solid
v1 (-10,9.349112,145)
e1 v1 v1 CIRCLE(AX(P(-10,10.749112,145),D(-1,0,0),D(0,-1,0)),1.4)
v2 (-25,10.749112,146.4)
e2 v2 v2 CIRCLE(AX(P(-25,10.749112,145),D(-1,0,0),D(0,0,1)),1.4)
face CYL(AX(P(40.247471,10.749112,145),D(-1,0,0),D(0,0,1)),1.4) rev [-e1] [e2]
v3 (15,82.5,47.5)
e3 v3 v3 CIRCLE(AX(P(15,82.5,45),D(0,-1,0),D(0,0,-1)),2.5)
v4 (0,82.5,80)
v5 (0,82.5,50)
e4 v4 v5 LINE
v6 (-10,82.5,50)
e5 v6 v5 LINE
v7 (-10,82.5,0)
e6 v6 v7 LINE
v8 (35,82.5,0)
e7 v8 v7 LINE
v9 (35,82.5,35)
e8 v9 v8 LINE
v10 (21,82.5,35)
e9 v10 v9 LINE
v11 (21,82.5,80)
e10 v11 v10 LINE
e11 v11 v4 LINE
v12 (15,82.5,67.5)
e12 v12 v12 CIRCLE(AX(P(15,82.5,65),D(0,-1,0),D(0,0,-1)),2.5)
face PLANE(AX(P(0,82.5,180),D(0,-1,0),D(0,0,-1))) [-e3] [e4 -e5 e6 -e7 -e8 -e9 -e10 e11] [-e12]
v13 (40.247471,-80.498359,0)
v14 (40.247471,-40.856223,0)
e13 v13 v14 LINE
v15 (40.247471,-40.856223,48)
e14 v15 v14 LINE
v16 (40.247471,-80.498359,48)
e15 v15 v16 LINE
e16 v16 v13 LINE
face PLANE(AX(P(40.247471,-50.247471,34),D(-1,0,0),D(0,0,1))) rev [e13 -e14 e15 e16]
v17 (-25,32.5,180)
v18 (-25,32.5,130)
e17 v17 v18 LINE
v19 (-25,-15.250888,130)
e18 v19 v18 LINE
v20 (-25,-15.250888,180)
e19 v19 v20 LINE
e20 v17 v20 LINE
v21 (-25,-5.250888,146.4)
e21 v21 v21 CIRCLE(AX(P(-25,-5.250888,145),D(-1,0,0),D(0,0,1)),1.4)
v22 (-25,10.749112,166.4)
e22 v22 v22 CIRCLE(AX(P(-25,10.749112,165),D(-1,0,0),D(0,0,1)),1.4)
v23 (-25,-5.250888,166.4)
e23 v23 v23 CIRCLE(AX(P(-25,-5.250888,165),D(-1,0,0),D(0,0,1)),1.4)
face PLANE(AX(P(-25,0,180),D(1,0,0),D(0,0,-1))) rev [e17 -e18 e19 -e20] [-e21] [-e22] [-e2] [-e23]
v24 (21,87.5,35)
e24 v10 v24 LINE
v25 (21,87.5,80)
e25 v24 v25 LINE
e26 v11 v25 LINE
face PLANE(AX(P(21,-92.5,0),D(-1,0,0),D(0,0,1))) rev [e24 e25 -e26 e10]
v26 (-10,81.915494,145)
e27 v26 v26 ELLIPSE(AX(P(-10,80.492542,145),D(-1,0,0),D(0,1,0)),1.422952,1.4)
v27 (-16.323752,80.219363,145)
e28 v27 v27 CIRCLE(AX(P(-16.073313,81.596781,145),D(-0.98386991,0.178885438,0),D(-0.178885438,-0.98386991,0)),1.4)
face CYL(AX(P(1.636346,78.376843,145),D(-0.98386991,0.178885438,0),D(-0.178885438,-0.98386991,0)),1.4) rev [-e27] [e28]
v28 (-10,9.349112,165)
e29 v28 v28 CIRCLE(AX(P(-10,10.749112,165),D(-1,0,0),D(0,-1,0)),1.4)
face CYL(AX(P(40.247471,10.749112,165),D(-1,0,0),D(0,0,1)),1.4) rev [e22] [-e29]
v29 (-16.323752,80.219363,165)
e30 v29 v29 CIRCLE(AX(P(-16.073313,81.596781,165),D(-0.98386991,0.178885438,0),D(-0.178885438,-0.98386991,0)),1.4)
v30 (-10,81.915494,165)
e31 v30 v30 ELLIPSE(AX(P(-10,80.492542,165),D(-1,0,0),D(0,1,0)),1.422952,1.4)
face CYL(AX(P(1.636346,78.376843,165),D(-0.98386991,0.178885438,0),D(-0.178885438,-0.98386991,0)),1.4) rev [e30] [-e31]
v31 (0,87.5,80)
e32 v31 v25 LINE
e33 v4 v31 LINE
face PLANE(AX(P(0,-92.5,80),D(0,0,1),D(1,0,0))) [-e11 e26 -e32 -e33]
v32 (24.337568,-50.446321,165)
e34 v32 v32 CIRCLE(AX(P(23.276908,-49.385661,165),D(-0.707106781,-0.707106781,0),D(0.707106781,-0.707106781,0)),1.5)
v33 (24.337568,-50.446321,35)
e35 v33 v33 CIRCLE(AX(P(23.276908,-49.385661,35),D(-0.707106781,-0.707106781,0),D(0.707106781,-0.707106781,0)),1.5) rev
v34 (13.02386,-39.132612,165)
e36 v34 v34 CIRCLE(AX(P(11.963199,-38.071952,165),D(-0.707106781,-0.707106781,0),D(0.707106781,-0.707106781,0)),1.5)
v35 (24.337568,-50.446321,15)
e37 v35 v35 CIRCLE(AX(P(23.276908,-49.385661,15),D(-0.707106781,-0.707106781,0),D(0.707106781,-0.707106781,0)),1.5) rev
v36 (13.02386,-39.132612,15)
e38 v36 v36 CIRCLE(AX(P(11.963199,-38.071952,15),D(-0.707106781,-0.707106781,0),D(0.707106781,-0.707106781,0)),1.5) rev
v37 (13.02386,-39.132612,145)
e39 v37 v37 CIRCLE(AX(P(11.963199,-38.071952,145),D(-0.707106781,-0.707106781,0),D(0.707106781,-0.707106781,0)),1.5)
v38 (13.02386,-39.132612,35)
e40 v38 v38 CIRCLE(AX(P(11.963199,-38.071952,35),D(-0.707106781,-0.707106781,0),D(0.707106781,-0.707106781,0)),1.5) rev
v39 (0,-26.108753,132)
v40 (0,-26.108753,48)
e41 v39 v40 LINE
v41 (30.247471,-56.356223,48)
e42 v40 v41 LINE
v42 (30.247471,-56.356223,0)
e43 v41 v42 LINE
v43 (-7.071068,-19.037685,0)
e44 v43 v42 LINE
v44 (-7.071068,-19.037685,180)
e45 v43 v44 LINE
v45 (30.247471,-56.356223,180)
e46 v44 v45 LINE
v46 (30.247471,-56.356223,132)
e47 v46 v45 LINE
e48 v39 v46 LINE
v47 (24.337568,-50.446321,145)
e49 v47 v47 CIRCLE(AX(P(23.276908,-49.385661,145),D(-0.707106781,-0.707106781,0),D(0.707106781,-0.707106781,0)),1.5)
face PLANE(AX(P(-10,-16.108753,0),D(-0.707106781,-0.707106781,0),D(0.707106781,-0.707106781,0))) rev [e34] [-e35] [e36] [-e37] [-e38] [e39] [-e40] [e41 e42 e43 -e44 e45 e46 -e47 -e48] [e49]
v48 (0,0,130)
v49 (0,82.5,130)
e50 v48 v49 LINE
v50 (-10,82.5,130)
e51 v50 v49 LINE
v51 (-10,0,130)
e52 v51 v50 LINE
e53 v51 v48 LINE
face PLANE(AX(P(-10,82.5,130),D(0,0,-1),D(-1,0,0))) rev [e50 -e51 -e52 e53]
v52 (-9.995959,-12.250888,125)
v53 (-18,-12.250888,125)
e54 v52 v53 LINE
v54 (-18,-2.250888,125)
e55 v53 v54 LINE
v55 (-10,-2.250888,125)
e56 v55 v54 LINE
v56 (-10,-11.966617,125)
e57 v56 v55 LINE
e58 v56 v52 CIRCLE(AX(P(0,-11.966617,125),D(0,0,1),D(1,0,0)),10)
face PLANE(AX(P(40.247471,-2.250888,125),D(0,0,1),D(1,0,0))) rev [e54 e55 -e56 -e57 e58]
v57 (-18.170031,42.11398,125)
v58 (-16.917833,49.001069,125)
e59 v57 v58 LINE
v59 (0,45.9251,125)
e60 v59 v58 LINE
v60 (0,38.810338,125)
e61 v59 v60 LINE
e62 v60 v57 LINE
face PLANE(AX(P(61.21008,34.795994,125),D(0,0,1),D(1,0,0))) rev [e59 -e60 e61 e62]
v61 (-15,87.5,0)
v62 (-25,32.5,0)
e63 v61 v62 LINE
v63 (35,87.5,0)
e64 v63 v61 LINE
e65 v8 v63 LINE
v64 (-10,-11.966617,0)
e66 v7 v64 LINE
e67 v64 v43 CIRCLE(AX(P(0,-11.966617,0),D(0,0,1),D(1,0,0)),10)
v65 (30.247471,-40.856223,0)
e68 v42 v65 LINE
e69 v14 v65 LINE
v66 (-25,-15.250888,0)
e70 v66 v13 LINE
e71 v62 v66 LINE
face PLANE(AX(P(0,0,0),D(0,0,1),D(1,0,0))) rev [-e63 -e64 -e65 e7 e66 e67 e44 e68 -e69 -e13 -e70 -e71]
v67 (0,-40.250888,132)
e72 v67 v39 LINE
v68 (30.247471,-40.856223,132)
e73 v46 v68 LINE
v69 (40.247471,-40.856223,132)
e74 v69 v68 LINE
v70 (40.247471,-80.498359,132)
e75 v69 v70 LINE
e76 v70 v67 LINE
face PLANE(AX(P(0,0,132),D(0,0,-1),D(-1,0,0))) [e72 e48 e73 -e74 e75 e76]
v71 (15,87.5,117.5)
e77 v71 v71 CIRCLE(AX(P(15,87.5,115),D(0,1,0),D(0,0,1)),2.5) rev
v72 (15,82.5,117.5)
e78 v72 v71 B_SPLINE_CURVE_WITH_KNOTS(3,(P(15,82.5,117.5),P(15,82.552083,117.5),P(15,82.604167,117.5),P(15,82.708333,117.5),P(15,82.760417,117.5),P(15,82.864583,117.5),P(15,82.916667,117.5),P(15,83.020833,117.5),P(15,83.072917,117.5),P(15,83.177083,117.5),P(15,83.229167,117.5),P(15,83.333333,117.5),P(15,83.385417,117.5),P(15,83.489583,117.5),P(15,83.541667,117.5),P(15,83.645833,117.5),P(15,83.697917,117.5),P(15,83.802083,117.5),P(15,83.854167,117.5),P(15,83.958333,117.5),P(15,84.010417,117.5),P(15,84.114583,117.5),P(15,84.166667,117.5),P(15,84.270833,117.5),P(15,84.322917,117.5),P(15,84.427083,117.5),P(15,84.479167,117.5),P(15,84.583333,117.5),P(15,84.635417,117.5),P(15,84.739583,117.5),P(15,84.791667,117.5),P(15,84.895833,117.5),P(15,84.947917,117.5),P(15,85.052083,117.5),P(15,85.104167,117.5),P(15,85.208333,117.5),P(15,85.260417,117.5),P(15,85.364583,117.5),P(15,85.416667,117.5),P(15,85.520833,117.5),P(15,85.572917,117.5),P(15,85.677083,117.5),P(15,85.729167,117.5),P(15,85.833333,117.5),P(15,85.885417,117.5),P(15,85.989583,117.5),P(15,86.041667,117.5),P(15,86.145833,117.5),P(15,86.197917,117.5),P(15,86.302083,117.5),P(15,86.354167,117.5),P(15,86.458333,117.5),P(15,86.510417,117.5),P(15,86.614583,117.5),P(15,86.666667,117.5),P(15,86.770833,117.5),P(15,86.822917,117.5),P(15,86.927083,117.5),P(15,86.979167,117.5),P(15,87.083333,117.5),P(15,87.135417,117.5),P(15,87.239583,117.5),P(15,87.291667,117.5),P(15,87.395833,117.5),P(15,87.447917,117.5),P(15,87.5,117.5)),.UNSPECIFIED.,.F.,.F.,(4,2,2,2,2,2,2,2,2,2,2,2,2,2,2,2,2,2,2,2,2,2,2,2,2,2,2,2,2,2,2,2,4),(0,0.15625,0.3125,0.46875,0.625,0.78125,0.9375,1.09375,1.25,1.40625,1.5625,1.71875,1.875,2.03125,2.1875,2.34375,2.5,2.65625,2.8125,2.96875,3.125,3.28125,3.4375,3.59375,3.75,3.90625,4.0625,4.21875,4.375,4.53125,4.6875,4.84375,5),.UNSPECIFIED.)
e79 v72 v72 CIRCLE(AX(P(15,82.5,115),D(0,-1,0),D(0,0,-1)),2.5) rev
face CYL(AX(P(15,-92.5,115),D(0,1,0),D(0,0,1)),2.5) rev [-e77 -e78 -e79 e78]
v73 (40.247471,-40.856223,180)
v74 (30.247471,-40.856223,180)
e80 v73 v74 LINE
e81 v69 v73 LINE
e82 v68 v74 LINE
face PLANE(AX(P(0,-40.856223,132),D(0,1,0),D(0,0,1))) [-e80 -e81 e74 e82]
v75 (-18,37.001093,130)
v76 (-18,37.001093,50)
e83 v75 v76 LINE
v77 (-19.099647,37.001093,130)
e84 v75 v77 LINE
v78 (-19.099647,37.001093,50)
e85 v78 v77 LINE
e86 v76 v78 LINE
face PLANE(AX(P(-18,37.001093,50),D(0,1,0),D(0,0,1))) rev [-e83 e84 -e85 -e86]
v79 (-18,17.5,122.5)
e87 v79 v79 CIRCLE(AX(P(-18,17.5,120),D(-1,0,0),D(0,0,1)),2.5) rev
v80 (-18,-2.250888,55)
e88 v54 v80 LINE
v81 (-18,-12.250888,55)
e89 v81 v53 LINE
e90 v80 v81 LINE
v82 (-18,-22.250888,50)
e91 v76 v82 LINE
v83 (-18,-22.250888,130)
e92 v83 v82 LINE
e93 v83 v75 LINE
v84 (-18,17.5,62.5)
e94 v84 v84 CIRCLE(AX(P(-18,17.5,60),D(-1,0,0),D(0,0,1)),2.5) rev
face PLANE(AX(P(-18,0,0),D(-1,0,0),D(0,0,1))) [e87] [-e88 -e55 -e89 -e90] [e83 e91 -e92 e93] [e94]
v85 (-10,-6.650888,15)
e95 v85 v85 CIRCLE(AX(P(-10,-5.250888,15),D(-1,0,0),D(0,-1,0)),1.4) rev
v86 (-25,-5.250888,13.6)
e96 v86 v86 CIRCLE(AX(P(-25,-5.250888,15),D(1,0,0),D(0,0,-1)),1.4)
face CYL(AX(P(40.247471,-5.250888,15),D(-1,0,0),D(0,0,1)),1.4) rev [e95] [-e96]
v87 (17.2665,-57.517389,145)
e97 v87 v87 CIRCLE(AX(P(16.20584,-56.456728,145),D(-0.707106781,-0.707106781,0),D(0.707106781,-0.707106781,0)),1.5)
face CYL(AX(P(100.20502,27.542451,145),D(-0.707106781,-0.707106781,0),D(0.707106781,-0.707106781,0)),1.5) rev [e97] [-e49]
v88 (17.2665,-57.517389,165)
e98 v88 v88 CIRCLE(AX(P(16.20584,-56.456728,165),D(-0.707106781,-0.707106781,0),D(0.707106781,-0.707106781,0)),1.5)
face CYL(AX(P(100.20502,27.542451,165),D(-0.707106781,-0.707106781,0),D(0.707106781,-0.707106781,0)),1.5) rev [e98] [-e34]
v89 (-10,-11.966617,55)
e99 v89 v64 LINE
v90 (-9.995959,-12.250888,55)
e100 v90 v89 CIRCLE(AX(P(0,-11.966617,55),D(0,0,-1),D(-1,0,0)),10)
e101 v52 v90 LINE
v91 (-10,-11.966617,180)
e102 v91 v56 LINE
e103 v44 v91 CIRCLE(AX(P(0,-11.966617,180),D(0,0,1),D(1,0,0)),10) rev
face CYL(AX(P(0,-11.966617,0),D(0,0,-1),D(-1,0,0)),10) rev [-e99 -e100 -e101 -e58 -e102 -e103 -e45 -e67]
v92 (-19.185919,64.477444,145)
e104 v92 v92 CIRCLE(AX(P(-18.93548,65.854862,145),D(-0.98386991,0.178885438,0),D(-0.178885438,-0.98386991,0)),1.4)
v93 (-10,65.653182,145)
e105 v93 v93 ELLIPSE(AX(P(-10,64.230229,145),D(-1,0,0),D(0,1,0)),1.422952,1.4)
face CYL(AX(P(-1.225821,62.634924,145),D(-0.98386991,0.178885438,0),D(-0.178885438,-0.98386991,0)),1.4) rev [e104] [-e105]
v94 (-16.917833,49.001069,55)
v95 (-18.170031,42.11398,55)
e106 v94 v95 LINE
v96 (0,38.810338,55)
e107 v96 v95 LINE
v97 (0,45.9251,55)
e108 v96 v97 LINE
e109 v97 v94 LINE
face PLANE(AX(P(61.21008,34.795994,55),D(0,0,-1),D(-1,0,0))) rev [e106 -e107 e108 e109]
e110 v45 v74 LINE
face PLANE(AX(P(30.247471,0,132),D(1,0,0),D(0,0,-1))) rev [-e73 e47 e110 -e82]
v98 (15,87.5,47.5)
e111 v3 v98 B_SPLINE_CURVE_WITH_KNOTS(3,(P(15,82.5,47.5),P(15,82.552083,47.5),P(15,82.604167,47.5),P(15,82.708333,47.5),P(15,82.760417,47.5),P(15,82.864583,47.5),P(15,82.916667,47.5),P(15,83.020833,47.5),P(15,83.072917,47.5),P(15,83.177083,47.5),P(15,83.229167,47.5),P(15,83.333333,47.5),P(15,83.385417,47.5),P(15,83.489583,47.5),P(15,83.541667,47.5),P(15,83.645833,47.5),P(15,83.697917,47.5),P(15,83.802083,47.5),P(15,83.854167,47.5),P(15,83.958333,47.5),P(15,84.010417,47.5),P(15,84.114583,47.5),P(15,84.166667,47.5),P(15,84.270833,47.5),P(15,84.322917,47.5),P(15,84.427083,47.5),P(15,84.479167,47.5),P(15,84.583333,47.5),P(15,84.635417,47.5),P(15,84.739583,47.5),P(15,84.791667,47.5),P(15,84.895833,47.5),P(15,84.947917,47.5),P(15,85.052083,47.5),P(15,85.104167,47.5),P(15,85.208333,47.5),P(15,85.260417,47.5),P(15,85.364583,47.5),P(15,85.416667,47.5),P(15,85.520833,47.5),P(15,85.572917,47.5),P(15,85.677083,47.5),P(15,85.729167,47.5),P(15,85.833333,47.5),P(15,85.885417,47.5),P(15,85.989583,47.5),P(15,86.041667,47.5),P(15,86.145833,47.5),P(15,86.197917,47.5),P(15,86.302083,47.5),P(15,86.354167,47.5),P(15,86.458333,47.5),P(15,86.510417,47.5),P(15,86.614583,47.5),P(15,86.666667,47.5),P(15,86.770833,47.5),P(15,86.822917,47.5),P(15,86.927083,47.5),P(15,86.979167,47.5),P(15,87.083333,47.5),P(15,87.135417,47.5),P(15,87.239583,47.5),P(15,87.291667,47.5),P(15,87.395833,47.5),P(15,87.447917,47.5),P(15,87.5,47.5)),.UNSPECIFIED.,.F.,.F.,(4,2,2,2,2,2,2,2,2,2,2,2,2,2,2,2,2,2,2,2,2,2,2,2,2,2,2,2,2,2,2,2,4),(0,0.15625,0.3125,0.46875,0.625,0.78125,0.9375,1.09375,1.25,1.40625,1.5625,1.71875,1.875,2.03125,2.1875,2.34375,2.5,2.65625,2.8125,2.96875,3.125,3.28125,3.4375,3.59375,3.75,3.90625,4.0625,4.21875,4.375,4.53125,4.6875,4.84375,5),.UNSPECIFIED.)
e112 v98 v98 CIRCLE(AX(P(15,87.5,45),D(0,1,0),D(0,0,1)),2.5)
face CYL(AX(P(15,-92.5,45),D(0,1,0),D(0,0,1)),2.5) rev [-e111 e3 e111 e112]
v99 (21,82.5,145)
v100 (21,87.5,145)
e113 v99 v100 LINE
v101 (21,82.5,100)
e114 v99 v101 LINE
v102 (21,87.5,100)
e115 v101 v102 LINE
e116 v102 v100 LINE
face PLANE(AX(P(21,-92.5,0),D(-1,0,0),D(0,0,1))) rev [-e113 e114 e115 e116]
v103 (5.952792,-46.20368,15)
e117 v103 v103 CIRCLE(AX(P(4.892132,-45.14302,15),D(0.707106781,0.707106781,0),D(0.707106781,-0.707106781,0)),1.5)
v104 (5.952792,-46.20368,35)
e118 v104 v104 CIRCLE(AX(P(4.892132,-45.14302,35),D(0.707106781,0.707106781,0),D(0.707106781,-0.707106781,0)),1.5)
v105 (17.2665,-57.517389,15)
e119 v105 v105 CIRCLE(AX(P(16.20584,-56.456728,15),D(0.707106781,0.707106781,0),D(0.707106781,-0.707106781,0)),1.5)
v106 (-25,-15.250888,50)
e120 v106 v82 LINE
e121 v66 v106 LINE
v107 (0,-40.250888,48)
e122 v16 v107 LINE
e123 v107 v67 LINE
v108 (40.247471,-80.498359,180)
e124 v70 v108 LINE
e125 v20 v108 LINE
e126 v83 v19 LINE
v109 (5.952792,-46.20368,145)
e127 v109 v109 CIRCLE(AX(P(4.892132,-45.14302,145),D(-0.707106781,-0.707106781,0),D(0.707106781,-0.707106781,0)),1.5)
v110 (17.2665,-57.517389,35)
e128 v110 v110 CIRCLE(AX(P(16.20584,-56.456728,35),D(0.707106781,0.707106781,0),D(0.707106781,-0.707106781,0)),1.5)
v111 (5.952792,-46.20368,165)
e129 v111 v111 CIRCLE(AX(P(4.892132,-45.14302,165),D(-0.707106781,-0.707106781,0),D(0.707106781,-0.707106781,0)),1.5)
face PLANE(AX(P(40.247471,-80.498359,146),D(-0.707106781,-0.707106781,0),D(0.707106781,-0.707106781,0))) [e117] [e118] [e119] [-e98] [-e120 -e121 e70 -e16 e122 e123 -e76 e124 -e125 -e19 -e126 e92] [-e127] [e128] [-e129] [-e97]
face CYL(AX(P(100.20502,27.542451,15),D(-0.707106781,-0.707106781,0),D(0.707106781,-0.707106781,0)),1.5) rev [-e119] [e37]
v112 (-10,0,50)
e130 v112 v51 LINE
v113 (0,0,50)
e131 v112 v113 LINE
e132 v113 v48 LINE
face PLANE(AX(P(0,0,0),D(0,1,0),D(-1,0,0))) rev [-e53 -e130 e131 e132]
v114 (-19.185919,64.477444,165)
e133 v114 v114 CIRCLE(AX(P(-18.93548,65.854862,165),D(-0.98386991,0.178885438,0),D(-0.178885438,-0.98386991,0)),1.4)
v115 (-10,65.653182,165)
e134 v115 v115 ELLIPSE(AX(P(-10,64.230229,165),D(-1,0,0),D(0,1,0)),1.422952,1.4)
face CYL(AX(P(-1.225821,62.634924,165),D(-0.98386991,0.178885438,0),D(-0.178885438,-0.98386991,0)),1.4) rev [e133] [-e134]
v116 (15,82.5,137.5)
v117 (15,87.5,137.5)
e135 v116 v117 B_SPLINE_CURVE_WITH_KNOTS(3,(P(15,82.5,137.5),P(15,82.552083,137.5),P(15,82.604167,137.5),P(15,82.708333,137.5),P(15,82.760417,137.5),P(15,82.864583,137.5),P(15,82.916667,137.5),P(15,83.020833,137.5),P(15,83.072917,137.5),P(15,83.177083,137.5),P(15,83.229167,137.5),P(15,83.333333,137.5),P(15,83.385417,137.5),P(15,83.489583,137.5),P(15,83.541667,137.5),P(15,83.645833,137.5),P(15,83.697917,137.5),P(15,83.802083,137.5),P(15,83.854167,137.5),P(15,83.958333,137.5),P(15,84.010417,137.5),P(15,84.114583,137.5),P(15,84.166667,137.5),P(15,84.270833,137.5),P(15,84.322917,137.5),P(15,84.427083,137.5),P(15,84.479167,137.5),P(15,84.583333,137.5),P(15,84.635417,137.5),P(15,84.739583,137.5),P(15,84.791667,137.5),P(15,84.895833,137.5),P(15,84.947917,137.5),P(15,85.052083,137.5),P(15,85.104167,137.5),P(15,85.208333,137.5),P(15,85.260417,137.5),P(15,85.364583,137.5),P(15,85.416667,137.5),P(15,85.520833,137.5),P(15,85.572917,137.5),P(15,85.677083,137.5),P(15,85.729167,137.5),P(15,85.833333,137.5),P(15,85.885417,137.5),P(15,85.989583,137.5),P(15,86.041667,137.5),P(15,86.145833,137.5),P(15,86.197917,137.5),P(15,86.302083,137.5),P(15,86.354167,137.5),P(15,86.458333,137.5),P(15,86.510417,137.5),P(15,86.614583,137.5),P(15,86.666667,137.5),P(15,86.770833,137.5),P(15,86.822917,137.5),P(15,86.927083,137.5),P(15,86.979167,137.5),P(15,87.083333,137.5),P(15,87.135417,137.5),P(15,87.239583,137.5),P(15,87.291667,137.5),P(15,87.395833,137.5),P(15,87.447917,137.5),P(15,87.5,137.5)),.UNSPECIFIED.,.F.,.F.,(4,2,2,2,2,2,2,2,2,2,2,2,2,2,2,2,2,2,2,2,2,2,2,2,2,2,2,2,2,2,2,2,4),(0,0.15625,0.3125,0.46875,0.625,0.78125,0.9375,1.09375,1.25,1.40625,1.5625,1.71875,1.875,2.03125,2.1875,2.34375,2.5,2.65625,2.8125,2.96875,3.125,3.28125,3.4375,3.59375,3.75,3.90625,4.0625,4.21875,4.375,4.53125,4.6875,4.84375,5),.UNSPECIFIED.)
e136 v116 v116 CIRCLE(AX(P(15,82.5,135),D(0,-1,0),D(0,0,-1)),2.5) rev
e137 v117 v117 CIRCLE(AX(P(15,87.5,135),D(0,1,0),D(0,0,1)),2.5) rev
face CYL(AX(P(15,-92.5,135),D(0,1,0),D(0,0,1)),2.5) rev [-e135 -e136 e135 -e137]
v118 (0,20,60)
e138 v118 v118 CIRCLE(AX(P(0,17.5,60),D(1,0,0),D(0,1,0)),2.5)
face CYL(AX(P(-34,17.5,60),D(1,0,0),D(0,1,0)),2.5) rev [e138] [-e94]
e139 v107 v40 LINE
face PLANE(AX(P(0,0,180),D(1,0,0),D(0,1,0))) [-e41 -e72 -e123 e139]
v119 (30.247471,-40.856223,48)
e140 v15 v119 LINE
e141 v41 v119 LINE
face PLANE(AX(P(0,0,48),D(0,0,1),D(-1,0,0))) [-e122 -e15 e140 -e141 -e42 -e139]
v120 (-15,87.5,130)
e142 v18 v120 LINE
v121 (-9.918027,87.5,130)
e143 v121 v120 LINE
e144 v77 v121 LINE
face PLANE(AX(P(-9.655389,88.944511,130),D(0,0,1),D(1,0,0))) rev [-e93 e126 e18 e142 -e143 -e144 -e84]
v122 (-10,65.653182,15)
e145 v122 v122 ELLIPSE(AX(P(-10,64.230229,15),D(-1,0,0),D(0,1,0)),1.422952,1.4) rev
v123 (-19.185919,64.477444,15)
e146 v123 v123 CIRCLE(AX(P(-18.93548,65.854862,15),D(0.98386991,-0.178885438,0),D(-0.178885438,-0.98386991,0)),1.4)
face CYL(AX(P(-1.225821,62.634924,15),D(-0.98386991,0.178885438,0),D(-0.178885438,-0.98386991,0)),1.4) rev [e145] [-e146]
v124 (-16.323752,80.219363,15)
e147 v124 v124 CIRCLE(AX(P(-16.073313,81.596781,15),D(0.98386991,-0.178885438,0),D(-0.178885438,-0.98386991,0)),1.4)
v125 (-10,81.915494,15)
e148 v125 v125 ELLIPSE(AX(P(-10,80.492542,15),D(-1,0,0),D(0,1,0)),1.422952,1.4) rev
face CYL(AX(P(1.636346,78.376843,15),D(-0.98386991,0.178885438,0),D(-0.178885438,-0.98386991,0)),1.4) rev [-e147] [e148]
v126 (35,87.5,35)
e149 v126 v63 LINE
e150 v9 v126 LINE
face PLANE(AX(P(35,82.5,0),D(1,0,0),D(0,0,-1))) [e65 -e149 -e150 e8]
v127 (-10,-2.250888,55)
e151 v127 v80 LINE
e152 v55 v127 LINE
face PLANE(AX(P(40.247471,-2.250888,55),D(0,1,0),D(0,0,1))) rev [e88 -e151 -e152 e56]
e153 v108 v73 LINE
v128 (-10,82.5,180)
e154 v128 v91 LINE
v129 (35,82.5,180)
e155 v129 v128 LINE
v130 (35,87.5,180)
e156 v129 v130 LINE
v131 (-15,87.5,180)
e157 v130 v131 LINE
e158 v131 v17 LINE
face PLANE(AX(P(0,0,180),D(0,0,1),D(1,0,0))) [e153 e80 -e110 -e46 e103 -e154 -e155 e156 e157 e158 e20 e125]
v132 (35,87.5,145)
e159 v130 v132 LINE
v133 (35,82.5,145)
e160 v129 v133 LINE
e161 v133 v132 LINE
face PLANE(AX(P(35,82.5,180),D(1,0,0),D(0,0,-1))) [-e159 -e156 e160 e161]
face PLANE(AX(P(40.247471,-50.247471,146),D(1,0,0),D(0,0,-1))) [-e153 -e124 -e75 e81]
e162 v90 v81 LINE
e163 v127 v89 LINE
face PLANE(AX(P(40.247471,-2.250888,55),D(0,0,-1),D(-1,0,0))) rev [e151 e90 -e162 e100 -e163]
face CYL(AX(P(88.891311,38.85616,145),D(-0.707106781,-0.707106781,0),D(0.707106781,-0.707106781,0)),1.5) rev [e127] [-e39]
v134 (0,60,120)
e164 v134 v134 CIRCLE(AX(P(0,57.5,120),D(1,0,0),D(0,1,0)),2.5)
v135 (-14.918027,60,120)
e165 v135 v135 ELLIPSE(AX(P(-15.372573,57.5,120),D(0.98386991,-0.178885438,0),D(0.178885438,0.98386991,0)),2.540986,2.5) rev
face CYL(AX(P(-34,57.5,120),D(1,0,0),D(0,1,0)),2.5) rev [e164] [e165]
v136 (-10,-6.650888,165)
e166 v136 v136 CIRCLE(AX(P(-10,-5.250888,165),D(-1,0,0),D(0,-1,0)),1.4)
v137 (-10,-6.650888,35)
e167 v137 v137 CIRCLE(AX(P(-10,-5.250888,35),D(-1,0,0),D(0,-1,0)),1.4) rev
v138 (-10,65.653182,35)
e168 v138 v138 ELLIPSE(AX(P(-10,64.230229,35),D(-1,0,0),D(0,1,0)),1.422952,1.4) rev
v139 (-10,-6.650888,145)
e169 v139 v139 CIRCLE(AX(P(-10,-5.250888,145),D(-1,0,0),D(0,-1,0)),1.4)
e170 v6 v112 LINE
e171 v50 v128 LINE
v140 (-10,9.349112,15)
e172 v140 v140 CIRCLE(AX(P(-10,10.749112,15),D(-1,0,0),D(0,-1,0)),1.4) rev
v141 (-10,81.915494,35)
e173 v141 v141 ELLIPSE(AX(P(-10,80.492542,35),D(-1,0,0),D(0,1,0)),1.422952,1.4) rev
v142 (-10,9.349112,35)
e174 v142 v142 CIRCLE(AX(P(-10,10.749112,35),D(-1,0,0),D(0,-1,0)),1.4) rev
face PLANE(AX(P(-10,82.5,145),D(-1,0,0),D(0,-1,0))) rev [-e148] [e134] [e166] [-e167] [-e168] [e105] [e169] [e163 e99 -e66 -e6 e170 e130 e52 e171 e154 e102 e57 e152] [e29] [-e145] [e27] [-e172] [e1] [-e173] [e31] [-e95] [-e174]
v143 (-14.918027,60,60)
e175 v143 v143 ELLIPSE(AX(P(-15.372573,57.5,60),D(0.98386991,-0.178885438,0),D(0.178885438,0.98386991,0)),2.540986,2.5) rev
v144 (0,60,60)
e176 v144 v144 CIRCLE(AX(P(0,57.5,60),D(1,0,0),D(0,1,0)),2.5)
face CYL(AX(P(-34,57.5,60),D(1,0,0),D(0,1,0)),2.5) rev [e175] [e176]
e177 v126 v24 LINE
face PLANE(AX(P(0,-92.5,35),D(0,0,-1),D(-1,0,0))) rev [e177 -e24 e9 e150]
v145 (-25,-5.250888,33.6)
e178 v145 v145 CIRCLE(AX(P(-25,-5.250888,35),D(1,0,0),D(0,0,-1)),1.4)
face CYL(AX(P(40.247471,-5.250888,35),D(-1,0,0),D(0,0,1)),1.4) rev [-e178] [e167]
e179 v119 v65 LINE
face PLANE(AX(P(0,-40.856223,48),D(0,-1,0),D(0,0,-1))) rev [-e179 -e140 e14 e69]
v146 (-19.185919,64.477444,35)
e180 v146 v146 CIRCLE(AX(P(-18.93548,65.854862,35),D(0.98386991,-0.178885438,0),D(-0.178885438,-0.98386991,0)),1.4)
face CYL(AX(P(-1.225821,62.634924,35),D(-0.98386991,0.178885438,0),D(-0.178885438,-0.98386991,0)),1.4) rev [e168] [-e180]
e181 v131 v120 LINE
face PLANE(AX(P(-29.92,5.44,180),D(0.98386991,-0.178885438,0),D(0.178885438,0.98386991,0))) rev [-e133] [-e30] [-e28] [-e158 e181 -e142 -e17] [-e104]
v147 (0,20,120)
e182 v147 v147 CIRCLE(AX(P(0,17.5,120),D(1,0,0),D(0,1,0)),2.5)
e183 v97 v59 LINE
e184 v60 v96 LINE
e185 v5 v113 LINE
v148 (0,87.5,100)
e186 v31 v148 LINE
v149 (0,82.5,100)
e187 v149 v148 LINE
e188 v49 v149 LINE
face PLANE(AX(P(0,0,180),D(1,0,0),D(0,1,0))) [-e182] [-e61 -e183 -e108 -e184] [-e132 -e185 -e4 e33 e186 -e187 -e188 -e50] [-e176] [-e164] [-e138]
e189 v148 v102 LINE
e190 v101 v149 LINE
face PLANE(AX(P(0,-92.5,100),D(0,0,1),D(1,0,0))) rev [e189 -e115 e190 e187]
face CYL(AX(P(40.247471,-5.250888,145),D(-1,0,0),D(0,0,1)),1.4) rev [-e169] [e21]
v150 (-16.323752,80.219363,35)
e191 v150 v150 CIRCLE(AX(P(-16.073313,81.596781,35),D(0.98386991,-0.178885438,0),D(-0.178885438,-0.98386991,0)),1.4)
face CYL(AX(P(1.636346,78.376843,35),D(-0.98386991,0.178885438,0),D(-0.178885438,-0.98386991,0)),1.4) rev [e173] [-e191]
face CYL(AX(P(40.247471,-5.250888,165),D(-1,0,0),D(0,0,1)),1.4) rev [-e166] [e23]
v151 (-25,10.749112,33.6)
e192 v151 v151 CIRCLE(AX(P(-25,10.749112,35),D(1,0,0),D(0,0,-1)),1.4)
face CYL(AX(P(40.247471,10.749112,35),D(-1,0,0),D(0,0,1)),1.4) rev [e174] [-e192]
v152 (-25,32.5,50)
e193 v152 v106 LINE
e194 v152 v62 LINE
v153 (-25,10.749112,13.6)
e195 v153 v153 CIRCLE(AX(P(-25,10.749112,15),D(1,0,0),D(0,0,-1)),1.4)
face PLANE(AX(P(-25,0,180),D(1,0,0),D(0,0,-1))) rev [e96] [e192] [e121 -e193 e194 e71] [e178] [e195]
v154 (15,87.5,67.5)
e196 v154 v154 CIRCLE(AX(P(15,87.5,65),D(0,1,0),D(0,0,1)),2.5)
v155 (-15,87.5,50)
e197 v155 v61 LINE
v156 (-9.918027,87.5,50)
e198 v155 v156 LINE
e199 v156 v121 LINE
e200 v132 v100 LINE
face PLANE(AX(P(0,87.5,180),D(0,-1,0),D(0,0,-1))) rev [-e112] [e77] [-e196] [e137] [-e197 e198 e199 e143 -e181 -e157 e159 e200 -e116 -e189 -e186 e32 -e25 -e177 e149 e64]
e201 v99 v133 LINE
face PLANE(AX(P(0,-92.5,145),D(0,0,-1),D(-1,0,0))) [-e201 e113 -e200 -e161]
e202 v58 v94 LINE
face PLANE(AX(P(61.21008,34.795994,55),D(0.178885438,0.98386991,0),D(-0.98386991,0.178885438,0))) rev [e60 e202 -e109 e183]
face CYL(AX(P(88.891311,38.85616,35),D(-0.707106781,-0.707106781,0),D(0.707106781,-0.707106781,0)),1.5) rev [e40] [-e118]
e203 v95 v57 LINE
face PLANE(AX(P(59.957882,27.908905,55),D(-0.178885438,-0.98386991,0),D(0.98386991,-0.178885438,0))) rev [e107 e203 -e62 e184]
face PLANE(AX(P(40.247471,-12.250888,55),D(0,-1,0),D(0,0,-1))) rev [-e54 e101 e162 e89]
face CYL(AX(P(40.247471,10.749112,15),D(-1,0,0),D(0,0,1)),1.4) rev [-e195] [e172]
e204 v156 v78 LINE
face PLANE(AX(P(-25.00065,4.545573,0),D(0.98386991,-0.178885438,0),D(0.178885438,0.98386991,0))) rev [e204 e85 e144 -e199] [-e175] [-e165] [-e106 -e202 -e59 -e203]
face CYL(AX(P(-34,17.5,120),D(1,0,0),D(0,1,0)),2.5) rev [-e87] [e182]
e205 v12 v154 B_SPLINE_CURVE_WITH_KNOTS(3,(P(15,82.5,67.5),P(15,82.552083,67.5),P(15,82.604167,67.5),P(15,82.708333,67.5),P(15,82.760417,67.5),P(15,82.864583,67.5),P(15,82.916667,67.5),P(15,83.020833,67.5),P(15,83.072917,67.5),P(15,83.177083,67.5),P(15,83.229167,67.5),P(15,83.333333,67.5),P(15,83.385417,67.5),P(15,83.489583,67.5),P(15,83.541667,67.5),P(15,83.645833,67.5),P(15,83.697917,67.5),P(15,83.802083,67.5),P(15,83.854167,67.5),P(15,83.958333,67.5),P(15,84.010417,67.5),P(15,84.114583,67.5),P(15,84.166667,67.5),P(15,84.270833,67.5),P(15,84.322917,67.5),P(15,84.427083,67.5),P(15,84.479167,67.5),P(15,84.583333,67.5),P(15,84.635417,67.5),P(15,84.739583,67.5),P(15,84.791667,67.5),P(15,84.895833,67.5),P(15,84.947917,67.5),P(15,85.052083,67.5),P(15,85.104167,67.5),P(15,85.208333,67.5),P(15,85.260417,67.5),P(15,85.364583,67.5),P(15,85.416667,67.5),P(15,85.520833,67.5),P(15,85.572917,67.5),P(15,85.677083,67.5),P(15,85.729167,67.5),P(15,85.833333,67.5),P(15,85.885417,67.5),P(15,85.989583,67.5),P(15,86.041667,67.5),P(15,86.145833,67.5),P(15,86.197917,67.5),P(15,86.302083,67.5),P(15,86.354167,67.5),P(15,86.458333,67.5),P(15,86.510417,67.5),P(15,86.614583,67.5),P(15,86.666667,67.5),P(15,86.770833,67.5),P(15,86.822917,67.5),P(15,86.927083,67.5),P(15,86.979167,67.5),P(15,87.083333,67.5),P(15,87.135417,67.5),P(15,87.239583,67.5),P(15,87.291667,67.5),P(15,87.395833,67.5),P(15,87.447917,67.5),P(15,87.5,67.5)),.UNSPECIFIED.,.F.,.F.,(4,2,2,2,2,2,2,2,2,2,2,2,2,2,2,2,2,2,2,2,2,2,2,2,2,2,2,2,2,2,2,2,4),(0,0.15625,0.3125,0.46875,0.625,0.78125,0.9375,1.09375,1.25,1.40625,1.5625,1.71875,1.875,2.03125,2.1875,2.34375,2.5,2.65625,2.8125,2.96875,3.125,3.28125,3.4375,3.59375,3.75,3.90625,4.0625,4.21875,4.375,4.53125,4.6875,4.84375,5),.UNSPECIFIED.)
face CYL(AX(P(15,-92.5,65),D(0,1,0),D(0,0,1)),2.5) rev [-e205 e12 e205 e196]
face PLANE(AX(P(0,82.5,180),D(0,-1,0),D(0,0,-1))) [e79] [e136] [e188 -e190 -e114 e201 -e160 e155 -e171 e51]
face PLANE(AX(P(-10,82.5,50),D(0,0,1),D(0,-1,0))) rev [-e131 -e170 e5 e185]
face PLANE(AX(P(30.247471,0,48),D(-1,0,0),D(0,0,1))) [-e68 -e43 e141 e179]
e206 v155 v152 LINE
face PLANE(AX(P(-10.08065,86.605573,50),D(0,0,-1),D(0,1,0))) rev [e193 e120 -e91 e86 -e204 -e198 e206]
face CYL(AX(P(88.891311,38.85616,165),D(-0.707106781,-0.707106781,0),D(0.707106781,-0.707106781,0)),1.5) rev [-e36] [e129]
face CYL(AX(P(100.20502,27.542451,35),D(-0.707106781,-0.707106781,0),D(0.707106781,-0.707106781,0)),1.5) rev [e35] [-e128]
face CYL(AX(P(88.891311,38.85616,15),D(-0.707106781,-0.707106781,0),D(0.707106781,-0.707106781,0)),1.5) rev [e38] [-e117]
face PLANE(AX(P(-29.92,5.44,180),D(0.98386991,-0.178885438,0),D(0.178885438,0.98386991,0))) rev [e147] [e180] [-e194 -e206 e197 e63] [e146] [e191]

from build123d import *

# Parameters (mm, degrees)
BOSS_EXTRUDE2_DEPTH = 180
SKETCH2_R           = 2.5
CUT_EXTRUDE1_DEPTH  = 180
SKETCH3_W           = 10
SKETCH3_H           = 82.5
CUT_EXTRUDE2_DEPTH  = 35
BOSS_EXTRUDE3_DEPTH = 34
CUT_EXTRUDE3_DEPTH  = 205.147272565
SKETCH6_R           = 2.5
CUT_EXTRUDE4_DEPTH  = 34
CUT_EXTRUDE5_DEPTH  = 5
SKETCH8_W           = 80
SKETCH8_H           = 62.155508182
CUT_EXTRUDE8_DEPTH  = 7
CUT_EXTRUDE9_DEPTH  = 205.147272565
SKETCH11_W          = 10
SKETCH11_H          = 35
BOSS_EXTRUDE4_DEPTH = 5
SKETCH12_W          = 15
SKETCH12_H          = 82.5
CUT_EXTRUDE11_DEPTH = 10
SKETCH10_R          = 1.4
CUT_EXTRUDE10_DEPTH = 18
SKETCH14_R          = 1.4
CUT_EXTRUDE12_DEPTH = 211.50767784
BOSS_EXTRUDE5_DEPTH = 14
SKETCH16_R          = 1.5
CUT_EXTRUDE13_DEPTH = 219.238688301
SKETCH17_W          = 70
SKETCH17_H          = 7
CUT_EXTRUDE14_DEPTH = 210.498896517
SKETCH18_W          = 70
SKETCH18_H          = 10
CUT_EXTRUDE15_DEPTH = 209.444279941
BOSS_EXTRUDE6_DEPTH = 48
FILLET1_R           = 10


# Read off the part's stored shape, not the designer's step: Boss-Extrude2
with BuildPart() as part:
    # Boss-Extrude2 outline → Boss-Extrude2 (new body)
    with BuildSketch(Plane.XY):
        Polygon((-25, 32.5), (-25, -32.5), (-15, -87.5), (25, -87.5), (25, -82.5), (0, -82.5), (0, 82.5), (25, 82.5), (25, 87.5), (-15, 87.5), align=None)
    extrude(amount=BOSS_EXTRUDE2_DEPTH)

    # Sketch2 → Cut-Extrude1 (cut)
    with BuildSketch(Plane(origin=(0, 87.5, 0), x_dir=(1, 0, 0), z_dir=(0, 1, 0))):
        Polygon((25, -35), (21, -35), (21, -80), (0, -80), (0, -100), (21, -100), (21, -145), (25, -145), align=None)
        with Locations(Location((15, -45, 0), (0, 0, 270))):
            Circle(SKETCH2_R)
        with Locations(Location((15, -65, 0), (0, 0, 270))):
            Circle(SKETCH2_R)
        with Locations(Location((15, -115, 0), (0, 0, 270))):
            Circle(SKETCH2_R)
        with Locations(Location((15, -135, 0), (0, 0, 270))):
            Circle(SKETCH2_R)
    extrude(amount=-CUT_EXTRUDE1_DEPTH, mode=Mode.SUBTRACT)

    # Sketch3 → Cut-Extrude2 (cut)
    with BuildSketch(Plane.XY.offset(180)):
        with Locations((-5, 41.25)):
            Rectangle(SKETCH3_W, SKETCH3_H)
    cut_extrude2 = extrude(amount=-CUT_EXTRUDE2_DEPTH, mode=Mode.SUBTRACT)

    # Mirror1: Cut-Extrude2 across plane
    add(cut_extrude2.mirror(Plane.XY.offset(90)), mode=Mode.SUBTRACT)

    # Sketch4 → Boss-Extrude3 (add)
    with BuildSketch(Plane.XY.offset(180)):
        Polygon((-10, 0), (40.247470675, -50.247470675), (40.247470675, -80.498358966), (-25, -15.250888291), align=None)
    boss_extrude3 = extrude(amount=-BOSS_EXTRUDE3_DEPTH)

    # Mirror2: Boss-Extrude3 across plane
    add(boss_extrude3.mirror(Plane.XY.offset(90)))

    # Sketch5 → Cut-Extrude3 (cut, through all)
    with BuildSketch(Plane.XY.offset(180)):
        Polygon((0, 0), (-10, 0), (0, -10), align=None)
        Polygon((0, -40.250888291), (-25, -15.250888291), (-25, -32.5), (-15, -87.5), (25, -87.5), (25, -82.5), (0, -82.5), align=None)
    extrude(amount=-CUT_EXTRUDE3_DEPTH, mode=Mode.SUBTRACT)

    # Sketch6 → Cut-Extrude4 (cut)
    with BuildSketch(Plane(origin=(0, 0, 0), x_dir=(0, 0, -1), z_dir=(1, 0, 0))):
        with Locations(Location((-120, 57.5, 0), (0, 0, 90))):
            Circle(SKETCH6_R)
        with Locations(Location((-60, 57.5, 0), (0, 0, 90))):
            Circle(SKETCH6_R)
        with Locations(Location((-120, 17.5, 0), (0, 0, 90))):
            Circle(SKETCH6_R)
        with Locations(Location((-60, 17.5, 0), (0, 0, 90))):
            Circle(SKETCH6_R)
    extrude(amount=-CUT_EXTRUDE4_DEPTH, mode=Mode.SUBTRACT)

    # Sketch7 → Cut-Extrude5 (cut)
    with BuildSketch(Plane(origin=(-29.92, 5.44, 0), x_dir=(0, 0, 1), z_dir=(-0.9838699100999075, 0.17888543819998307, 0))):
        Polygon((50, 83.405335561), (50, 27.503636123), (130, 27.503636123), (130, 85.782619375), (130, 90.970472455), (50, 90.970472455), align=None)
    extrude(amount=-CUT_EXTRUDE5_DEPTH, mode=Mode.SUBTRACT)

    # Sketch8 → Cut-Extrude8 (cut)
    with BuildSketch(Plane.ZY.offset(25)):
        with Locations((90, 5.923338625)):
            Rectangle(SKETCH8_W, SKETCH8_H)
    extrude(amount=-CUT_EXTRUDE8_DEPTH, mode=Mode.SUBTRACT)

    # Sketch9 → Cut-Extrude9 (cut, through all)
    with BuildSketch(Plane.XY.offset(180)):
        Polygon((-10, 0), (40.247470675, -50.247470675), (40.247470675, -66.356223342), (-10, -16.108752667), align=None)
    extrude(amount=-CUT_EXTRUDE9_DEPTH, mode=Mode.SUBTRACT)

    # Sketch11 → Boss-Extrude4 (add)
    with BuildSketch(Plane(origin=(0, 87.5, 0), x_dir=(1, 0, 0), z_dir=(0, 1, 0))):
        with Locations((30, -17.5)):
            Rectangle(SKETCH11_W, SKETCH11_H)
        with Locations((30, -162.5)):
            Rectangle(SKETCH11_W, SKETCH11_H)
    extrude(amount=-BOSS_EXTRUDE4_DEPTH)

    # Sketch12 → Cut-Extrude11 (cut)
    with BuildSketch(Plane(origin=(0, 0, 0), x_dir=(0, 0, -1), z_dir=(1, 0, 0))):
        with Locations((-137.5, 41.25)):
            Rectangle(SKETCH12_W, SKETCH12_H)
        with Locations((-42.5, 41.25)):
            Rectangle(SKETCH12_W, SKETCH12_H)
    extrude(amount=-CUT_EXTRUDE11_DEPTH, mode=Mode.SUBTRACT)

    # Sketch10 → Cut-Extrude10 (cut)
    with BuildSketch(Plane(origin=(-29.92, 5.44, 0), x_dir=(0, 0, 1), z_dir=(-0.9838699100999075, 0.17888543819998307, 0))):
        with Locations(Location((165, 77.405335561, 0), (0, 0, 270))):
            Circle(SKETCH10_R)
        with Locations(Location((145, 77.405335561, 0), (0, 0, 270))):
            Circle(SKETCH10_R)
        with Locations(Location((145, 61.405335561, 0), (0, 0, 270))):
            Circle(SKETCH10_R)
        with Locations(Location((165, 61.405335561, 0), (0, 0, 270))):
            Circle(SKETCH10_R)
    cut_extrude10 = extrude(amount=-CUT_EXTRUDE10_DEPTH, mode=Mode.SUBTRACT)

    # Mirror3: Cut-Extrude10 across plane
    add(cut_extrude10.mirror(Plane.XY.offset(90)), mode=Mode.SUBTRACT)

    # Sketch14 → Cut-Extrude12 (cut, through all)
    with BuildSketch(Plane.ZY.offset(25)):
        with Locations((165, -5.250888291)):
            Circle(SKETCH14_R)
        with Locations((145, -5.250888291)):
            Circle(SKETCH14_R)
        with Locations((145, 10.749111709)):
            Circle(SKETCH14_R)
        with Locations((165, 10.749111709)):
            Circle(SKETCH14_R)
    cut_extrude12 = extrude(amount=-CUT_EXTRUDE12_DEPTH, mode=Mode.SUBTRACT)

    # Sketch15 → Boss-Extrude5 (add)
    with BuildSketch(Plane(origin=(0, 0, 146), x_dir=(-1, 0, 0), z_dir=(0, 0, -1))):
        Polygon((0, -40.250888291), (0, -26.108752667), (-40.247470675, -66.356223342), (-40.247470675, -80.498358966), align=None)
    boss_extrude5 = extrude(amount=BOSS_EXTRUDE5_DEPTH)

    # Mirror4: Boss-Extrude5 across plane
    add(boss_extrude5.mirror(Plane.XY.offset(90)))

    # Mirror5: Cut-Extrude12 across plane
    add(cut_extrude12.mirror(Plane.XY.offset(90)), mode=Mode.SUBTRACT)

    # Sketch16 → Cut-Extrude13 (cut, through all)
    with BuildSketch(Plane(origin=(-20.125444145, -20.125444145, 0), x_dir=(0, 0, 1), z_dir=(-0.7071067811865476, -0.7071067811865476, 0))):
        with Locations(Location((165, -35.380194939, 0), (0, 0, 270))):
            Circle(SKETCH16_R)
        with Locations(Location((145, -35.380194939, 0), (0, 0, 270))):
            Circle(SKETCH16_R)
        with Locations(Location((145, -51.380194939, 0), (0, 0, 270))):
            Circle(SKETCH16_R)
        with Locations(Location((165, -51.380194939, 0), (0, 0, 270))):
            Circle(SKETCH16_R)
    cut_extrude13 = extrude(amount=-CUT_EXTRUDE13_DEPTH, mode=Mode.SUBTRACT)

    # Mirror6: Cut-Extrude13 across plane
    add(cut_extrude13.mirror(Plane.XY.offset(90)), mode=Mode.SUBTRACT)

    # Sketch17 → Cut-Extrude14 (cut, through all)
    with BuildSketch(Plane(origin=(-25.00065045, 4.545572809, 0), x_dir=(0, 0, 1), z_dir=(-0.9838699100999075, 0.17888543819998304, 0))):
        with Locations((90, 41.684323876)):
            Rectangle(SKETCH17_W, SKETCH17_H)
    extrude(amount=-CUT_EXTRUDE14_DEPTH, mode=Mode.SUBTRACT)

    # Sketch18 → Cut-Extrude15 (cut, through all)
    with BuildSketch(Plane.ZY.offset(18)):
        with Locations((90, -7.250888291)):
            Rectangle(SKETCH18_W, SKETCH18_H)
    extrude(amount=-CUT_EXTRUDE15_DEPTH, mode=Mode.SUBTRACT)

    # Sketch19 → Boss-Extrude6 (add)
    with BuildSketch(Plane.XY.offset(180)):
        Polygon((30.247470675, -56.356223342), (40.247470675, -66.356223342), (40.247470675, -40.856223342), (30.247470675, -40.856223342), align=None)
    boss_extrude6 = extrude(amount=-BOSS_EXTRUDE6_DEPTH)

    # Mirror7: Boss-Extrude6 across plane
    add(boss_extrude6.mirror(Plane.XY.offset(90)))

    # Fillet1
    # the kernel refuses this fillet: 10 mm, written as the material it adds along each edge
    with BuildSketch(Plane(origin=(-10, -16.108752667, 180), x_dir=(0, 1, 0), z_dir=(0, 0, -1))) as fillet1_piece_1_section:
        with BuildLine():
            CenterArc((FILLET1_R * 0.414213562373, FILLET1_R), FILLET1_R, 225, 45)
            Line((-FILLET1_R * 0.292893218813, FILLET1_R * 0.292893218813), (0, 0))
            Line((0, 0), (FILLET1_R * 0.414213562373, 0))
        make_face()
    fillet1_piece_1 = extrude(amount=180, mode=Mode.PRIVATE)
    fillet1_piece_1 = split(fillet1_piece_1, bisect_by=Plane(origin=(-10.099322896, -12.109228126, 125), z_dir=(0, 0, 1)), keep=Keep.TOP, mode=Mode.PRIVATE)
    fillet1_piece_1 = split(fillet1_piece_1, bisect_by=Plane(origin=(-10.099322896, -12.250888291, 152.5), z_dir=(0, 1, 0)), keep=Keep.TOP, mode=Mode.PRIVATE)
    add(fillet1_piece_1)
    with BuildSketch(Plane(origin=(-10, -16.108752667, 180), x_dir=(0, 1, 0), z_dir=(0, 0, -1))) as fillet1_piece_2_section:
        with BuildLine():
            CenterArc((FILLET1_R * 0.414213562373, FILLET1_R), FILLET1_R, 225, 45)
            Line((-FILLET1_R * 0.292893218813, FILLET1_R * 0.292893218813), (0, 0))
            Line((0, 0), (FILLET1_R * 0.414213562373, 0))
        make_face()
    fillet1_piece_2 = extrude(amount=180, mode=Mode.PRIVATE)
    fillet1_piece_2 = split(fillet1_piece_2, bisect_by=Plane(origin=(-9.370999607, -15.909597181, 125), z_dir=(0, 0, 1)), keep=Keep.TOP, mode=Mode.PRIVATE)
    fillet1_piece_2 = split(fillet1_piece_2, bisect_by=Plane(origin=(-9.370999607, -12.250888291, 152.5), z_dir=(0, -1, 0)), keep=Keep.TOP, mode=Mode.PRIVATE)
    add(fillet1_piece_2)
    with BuildSketch(Plane(origin=(-10, -16.108752667, 180), x_dir=(0, 1, 0), z_dir=(0, 0, -1))) as fillet1_piece_3_section:
        with BuildLine():
            CenterArc((FILLET1_R * 0.414213562373, FILLET1_R), FILLET1_R, 225, 45)
            Line((-FILLET1_R * 0.292893218813, FILLET1_R * 0.292893218813), (0, 0))
            Line((0, 0), (FILLET1_R * 0.414213562373, 0))
        make_face()
    fillet1_piece_3 = extrude(amount=180, mode=Mode.PRIVATE)
    fillet1_piece_3 = split(fillet1_piece_3, bisect_by=Plane(origin=(-9.370999607, -15.909597181, 125), z_dir=(0, 0, -1)), keep=Keep.TOP, mode=Mode.PRIVATE)
    fillet1_piece_3 = split(fillet1_piece_3, bisect_by=Plane(origin=(-9.370999607, -12.250888291, 90), z_dir=(0, -1, 0)), keep=Keep.TOP, mode=Mode.PRIVATE)
    fillet1_piece_3 = split(fillet1_piece_3, bisect_by=Plane(origin=(-9.370999607, -15.909597181, 55), z_dir=(0, 0, 1)), keep=Keep.TOP, mode=Mode.PRIVATE)
    add(fillet1_piece_3)
    with BuildSketch(Plane(origin=(-10, -16.108752667, 180), x_dir=(0, 1, 0), z_dir=(0, 0, -1))) as fillet1_piece_4_section:
        with BuildLine():
            CenterArc((FILLET1_R * 0.414213562373, FILLET1_R), FILLET1_R, 225, 45)
            Line((-FILLET1_R * 0.292893218813, FILLET1_R * 0.292893218813), (0, 0))
            Line((0, 0), (FILLET1_R * 0.414213562373, 0))
        make_face()
    fillet1_piece_4 = extrude(amount=180, mode=Mode.PRIVATE)
    fillet1_piece_4 = split(fillet1_piece_4, bisect_by=Plane(origin=(-10.099322896, -12.250888291, 27.5), z_dir=(0, 1, 0)), keep=Keep.TOP, mode=Mode.PRIVATE)
    fillet1_piece_4 = split(fillet1_piece_4, bisect_by=Plane(origin=(-10.099322896, -12.109228126, 55), z_dir=(0, 0, -1)), keep=Keep.TOP, mode=Mode.PRIVATE)
    add(fillet1_piece_4)
    with BuildSketch(Plane(origin=(-10, -16.108752667, 180), x_dir=(0, 1, 0), z_dir=(0, 0, -1))) as fillet1_piece_5_section:
        with BuildLine():
            CenterArc((FILLET1_R * 0.414213562373, FILLET1_R), FILLET1_R, 225, 45)
            Line((-FILLET1_R * 0.292893218813, FILLET1_R * 0.292893218813), (0, 0))
            Line((0, 0), (FILLET1_R * 0.414213562373, 0))
        make_face()
    fillet1_piece_5 = extrude(amount=180, mode=Mode.PRIVATE)
    fillet1_piece_5 = split(fillet1_piece_5, bisect_by=Plane(origin=(-9.370999607, -12.250888291, 27.5), z_dir=(0, -1, 0)), keep=Keep.TOP, mode=Mode.PRIVATE)
    fillet1_piece_5 = split(fillet1_piece_5, bisect_by=Plane(origin=(-9.370999607, -15.909597181, 55), z_dir=(0, 0, -1)), keep=Keep.TOP, mode=Mode.PRIVATE)
    add(fillet1_piece_5)


solid = part.part
